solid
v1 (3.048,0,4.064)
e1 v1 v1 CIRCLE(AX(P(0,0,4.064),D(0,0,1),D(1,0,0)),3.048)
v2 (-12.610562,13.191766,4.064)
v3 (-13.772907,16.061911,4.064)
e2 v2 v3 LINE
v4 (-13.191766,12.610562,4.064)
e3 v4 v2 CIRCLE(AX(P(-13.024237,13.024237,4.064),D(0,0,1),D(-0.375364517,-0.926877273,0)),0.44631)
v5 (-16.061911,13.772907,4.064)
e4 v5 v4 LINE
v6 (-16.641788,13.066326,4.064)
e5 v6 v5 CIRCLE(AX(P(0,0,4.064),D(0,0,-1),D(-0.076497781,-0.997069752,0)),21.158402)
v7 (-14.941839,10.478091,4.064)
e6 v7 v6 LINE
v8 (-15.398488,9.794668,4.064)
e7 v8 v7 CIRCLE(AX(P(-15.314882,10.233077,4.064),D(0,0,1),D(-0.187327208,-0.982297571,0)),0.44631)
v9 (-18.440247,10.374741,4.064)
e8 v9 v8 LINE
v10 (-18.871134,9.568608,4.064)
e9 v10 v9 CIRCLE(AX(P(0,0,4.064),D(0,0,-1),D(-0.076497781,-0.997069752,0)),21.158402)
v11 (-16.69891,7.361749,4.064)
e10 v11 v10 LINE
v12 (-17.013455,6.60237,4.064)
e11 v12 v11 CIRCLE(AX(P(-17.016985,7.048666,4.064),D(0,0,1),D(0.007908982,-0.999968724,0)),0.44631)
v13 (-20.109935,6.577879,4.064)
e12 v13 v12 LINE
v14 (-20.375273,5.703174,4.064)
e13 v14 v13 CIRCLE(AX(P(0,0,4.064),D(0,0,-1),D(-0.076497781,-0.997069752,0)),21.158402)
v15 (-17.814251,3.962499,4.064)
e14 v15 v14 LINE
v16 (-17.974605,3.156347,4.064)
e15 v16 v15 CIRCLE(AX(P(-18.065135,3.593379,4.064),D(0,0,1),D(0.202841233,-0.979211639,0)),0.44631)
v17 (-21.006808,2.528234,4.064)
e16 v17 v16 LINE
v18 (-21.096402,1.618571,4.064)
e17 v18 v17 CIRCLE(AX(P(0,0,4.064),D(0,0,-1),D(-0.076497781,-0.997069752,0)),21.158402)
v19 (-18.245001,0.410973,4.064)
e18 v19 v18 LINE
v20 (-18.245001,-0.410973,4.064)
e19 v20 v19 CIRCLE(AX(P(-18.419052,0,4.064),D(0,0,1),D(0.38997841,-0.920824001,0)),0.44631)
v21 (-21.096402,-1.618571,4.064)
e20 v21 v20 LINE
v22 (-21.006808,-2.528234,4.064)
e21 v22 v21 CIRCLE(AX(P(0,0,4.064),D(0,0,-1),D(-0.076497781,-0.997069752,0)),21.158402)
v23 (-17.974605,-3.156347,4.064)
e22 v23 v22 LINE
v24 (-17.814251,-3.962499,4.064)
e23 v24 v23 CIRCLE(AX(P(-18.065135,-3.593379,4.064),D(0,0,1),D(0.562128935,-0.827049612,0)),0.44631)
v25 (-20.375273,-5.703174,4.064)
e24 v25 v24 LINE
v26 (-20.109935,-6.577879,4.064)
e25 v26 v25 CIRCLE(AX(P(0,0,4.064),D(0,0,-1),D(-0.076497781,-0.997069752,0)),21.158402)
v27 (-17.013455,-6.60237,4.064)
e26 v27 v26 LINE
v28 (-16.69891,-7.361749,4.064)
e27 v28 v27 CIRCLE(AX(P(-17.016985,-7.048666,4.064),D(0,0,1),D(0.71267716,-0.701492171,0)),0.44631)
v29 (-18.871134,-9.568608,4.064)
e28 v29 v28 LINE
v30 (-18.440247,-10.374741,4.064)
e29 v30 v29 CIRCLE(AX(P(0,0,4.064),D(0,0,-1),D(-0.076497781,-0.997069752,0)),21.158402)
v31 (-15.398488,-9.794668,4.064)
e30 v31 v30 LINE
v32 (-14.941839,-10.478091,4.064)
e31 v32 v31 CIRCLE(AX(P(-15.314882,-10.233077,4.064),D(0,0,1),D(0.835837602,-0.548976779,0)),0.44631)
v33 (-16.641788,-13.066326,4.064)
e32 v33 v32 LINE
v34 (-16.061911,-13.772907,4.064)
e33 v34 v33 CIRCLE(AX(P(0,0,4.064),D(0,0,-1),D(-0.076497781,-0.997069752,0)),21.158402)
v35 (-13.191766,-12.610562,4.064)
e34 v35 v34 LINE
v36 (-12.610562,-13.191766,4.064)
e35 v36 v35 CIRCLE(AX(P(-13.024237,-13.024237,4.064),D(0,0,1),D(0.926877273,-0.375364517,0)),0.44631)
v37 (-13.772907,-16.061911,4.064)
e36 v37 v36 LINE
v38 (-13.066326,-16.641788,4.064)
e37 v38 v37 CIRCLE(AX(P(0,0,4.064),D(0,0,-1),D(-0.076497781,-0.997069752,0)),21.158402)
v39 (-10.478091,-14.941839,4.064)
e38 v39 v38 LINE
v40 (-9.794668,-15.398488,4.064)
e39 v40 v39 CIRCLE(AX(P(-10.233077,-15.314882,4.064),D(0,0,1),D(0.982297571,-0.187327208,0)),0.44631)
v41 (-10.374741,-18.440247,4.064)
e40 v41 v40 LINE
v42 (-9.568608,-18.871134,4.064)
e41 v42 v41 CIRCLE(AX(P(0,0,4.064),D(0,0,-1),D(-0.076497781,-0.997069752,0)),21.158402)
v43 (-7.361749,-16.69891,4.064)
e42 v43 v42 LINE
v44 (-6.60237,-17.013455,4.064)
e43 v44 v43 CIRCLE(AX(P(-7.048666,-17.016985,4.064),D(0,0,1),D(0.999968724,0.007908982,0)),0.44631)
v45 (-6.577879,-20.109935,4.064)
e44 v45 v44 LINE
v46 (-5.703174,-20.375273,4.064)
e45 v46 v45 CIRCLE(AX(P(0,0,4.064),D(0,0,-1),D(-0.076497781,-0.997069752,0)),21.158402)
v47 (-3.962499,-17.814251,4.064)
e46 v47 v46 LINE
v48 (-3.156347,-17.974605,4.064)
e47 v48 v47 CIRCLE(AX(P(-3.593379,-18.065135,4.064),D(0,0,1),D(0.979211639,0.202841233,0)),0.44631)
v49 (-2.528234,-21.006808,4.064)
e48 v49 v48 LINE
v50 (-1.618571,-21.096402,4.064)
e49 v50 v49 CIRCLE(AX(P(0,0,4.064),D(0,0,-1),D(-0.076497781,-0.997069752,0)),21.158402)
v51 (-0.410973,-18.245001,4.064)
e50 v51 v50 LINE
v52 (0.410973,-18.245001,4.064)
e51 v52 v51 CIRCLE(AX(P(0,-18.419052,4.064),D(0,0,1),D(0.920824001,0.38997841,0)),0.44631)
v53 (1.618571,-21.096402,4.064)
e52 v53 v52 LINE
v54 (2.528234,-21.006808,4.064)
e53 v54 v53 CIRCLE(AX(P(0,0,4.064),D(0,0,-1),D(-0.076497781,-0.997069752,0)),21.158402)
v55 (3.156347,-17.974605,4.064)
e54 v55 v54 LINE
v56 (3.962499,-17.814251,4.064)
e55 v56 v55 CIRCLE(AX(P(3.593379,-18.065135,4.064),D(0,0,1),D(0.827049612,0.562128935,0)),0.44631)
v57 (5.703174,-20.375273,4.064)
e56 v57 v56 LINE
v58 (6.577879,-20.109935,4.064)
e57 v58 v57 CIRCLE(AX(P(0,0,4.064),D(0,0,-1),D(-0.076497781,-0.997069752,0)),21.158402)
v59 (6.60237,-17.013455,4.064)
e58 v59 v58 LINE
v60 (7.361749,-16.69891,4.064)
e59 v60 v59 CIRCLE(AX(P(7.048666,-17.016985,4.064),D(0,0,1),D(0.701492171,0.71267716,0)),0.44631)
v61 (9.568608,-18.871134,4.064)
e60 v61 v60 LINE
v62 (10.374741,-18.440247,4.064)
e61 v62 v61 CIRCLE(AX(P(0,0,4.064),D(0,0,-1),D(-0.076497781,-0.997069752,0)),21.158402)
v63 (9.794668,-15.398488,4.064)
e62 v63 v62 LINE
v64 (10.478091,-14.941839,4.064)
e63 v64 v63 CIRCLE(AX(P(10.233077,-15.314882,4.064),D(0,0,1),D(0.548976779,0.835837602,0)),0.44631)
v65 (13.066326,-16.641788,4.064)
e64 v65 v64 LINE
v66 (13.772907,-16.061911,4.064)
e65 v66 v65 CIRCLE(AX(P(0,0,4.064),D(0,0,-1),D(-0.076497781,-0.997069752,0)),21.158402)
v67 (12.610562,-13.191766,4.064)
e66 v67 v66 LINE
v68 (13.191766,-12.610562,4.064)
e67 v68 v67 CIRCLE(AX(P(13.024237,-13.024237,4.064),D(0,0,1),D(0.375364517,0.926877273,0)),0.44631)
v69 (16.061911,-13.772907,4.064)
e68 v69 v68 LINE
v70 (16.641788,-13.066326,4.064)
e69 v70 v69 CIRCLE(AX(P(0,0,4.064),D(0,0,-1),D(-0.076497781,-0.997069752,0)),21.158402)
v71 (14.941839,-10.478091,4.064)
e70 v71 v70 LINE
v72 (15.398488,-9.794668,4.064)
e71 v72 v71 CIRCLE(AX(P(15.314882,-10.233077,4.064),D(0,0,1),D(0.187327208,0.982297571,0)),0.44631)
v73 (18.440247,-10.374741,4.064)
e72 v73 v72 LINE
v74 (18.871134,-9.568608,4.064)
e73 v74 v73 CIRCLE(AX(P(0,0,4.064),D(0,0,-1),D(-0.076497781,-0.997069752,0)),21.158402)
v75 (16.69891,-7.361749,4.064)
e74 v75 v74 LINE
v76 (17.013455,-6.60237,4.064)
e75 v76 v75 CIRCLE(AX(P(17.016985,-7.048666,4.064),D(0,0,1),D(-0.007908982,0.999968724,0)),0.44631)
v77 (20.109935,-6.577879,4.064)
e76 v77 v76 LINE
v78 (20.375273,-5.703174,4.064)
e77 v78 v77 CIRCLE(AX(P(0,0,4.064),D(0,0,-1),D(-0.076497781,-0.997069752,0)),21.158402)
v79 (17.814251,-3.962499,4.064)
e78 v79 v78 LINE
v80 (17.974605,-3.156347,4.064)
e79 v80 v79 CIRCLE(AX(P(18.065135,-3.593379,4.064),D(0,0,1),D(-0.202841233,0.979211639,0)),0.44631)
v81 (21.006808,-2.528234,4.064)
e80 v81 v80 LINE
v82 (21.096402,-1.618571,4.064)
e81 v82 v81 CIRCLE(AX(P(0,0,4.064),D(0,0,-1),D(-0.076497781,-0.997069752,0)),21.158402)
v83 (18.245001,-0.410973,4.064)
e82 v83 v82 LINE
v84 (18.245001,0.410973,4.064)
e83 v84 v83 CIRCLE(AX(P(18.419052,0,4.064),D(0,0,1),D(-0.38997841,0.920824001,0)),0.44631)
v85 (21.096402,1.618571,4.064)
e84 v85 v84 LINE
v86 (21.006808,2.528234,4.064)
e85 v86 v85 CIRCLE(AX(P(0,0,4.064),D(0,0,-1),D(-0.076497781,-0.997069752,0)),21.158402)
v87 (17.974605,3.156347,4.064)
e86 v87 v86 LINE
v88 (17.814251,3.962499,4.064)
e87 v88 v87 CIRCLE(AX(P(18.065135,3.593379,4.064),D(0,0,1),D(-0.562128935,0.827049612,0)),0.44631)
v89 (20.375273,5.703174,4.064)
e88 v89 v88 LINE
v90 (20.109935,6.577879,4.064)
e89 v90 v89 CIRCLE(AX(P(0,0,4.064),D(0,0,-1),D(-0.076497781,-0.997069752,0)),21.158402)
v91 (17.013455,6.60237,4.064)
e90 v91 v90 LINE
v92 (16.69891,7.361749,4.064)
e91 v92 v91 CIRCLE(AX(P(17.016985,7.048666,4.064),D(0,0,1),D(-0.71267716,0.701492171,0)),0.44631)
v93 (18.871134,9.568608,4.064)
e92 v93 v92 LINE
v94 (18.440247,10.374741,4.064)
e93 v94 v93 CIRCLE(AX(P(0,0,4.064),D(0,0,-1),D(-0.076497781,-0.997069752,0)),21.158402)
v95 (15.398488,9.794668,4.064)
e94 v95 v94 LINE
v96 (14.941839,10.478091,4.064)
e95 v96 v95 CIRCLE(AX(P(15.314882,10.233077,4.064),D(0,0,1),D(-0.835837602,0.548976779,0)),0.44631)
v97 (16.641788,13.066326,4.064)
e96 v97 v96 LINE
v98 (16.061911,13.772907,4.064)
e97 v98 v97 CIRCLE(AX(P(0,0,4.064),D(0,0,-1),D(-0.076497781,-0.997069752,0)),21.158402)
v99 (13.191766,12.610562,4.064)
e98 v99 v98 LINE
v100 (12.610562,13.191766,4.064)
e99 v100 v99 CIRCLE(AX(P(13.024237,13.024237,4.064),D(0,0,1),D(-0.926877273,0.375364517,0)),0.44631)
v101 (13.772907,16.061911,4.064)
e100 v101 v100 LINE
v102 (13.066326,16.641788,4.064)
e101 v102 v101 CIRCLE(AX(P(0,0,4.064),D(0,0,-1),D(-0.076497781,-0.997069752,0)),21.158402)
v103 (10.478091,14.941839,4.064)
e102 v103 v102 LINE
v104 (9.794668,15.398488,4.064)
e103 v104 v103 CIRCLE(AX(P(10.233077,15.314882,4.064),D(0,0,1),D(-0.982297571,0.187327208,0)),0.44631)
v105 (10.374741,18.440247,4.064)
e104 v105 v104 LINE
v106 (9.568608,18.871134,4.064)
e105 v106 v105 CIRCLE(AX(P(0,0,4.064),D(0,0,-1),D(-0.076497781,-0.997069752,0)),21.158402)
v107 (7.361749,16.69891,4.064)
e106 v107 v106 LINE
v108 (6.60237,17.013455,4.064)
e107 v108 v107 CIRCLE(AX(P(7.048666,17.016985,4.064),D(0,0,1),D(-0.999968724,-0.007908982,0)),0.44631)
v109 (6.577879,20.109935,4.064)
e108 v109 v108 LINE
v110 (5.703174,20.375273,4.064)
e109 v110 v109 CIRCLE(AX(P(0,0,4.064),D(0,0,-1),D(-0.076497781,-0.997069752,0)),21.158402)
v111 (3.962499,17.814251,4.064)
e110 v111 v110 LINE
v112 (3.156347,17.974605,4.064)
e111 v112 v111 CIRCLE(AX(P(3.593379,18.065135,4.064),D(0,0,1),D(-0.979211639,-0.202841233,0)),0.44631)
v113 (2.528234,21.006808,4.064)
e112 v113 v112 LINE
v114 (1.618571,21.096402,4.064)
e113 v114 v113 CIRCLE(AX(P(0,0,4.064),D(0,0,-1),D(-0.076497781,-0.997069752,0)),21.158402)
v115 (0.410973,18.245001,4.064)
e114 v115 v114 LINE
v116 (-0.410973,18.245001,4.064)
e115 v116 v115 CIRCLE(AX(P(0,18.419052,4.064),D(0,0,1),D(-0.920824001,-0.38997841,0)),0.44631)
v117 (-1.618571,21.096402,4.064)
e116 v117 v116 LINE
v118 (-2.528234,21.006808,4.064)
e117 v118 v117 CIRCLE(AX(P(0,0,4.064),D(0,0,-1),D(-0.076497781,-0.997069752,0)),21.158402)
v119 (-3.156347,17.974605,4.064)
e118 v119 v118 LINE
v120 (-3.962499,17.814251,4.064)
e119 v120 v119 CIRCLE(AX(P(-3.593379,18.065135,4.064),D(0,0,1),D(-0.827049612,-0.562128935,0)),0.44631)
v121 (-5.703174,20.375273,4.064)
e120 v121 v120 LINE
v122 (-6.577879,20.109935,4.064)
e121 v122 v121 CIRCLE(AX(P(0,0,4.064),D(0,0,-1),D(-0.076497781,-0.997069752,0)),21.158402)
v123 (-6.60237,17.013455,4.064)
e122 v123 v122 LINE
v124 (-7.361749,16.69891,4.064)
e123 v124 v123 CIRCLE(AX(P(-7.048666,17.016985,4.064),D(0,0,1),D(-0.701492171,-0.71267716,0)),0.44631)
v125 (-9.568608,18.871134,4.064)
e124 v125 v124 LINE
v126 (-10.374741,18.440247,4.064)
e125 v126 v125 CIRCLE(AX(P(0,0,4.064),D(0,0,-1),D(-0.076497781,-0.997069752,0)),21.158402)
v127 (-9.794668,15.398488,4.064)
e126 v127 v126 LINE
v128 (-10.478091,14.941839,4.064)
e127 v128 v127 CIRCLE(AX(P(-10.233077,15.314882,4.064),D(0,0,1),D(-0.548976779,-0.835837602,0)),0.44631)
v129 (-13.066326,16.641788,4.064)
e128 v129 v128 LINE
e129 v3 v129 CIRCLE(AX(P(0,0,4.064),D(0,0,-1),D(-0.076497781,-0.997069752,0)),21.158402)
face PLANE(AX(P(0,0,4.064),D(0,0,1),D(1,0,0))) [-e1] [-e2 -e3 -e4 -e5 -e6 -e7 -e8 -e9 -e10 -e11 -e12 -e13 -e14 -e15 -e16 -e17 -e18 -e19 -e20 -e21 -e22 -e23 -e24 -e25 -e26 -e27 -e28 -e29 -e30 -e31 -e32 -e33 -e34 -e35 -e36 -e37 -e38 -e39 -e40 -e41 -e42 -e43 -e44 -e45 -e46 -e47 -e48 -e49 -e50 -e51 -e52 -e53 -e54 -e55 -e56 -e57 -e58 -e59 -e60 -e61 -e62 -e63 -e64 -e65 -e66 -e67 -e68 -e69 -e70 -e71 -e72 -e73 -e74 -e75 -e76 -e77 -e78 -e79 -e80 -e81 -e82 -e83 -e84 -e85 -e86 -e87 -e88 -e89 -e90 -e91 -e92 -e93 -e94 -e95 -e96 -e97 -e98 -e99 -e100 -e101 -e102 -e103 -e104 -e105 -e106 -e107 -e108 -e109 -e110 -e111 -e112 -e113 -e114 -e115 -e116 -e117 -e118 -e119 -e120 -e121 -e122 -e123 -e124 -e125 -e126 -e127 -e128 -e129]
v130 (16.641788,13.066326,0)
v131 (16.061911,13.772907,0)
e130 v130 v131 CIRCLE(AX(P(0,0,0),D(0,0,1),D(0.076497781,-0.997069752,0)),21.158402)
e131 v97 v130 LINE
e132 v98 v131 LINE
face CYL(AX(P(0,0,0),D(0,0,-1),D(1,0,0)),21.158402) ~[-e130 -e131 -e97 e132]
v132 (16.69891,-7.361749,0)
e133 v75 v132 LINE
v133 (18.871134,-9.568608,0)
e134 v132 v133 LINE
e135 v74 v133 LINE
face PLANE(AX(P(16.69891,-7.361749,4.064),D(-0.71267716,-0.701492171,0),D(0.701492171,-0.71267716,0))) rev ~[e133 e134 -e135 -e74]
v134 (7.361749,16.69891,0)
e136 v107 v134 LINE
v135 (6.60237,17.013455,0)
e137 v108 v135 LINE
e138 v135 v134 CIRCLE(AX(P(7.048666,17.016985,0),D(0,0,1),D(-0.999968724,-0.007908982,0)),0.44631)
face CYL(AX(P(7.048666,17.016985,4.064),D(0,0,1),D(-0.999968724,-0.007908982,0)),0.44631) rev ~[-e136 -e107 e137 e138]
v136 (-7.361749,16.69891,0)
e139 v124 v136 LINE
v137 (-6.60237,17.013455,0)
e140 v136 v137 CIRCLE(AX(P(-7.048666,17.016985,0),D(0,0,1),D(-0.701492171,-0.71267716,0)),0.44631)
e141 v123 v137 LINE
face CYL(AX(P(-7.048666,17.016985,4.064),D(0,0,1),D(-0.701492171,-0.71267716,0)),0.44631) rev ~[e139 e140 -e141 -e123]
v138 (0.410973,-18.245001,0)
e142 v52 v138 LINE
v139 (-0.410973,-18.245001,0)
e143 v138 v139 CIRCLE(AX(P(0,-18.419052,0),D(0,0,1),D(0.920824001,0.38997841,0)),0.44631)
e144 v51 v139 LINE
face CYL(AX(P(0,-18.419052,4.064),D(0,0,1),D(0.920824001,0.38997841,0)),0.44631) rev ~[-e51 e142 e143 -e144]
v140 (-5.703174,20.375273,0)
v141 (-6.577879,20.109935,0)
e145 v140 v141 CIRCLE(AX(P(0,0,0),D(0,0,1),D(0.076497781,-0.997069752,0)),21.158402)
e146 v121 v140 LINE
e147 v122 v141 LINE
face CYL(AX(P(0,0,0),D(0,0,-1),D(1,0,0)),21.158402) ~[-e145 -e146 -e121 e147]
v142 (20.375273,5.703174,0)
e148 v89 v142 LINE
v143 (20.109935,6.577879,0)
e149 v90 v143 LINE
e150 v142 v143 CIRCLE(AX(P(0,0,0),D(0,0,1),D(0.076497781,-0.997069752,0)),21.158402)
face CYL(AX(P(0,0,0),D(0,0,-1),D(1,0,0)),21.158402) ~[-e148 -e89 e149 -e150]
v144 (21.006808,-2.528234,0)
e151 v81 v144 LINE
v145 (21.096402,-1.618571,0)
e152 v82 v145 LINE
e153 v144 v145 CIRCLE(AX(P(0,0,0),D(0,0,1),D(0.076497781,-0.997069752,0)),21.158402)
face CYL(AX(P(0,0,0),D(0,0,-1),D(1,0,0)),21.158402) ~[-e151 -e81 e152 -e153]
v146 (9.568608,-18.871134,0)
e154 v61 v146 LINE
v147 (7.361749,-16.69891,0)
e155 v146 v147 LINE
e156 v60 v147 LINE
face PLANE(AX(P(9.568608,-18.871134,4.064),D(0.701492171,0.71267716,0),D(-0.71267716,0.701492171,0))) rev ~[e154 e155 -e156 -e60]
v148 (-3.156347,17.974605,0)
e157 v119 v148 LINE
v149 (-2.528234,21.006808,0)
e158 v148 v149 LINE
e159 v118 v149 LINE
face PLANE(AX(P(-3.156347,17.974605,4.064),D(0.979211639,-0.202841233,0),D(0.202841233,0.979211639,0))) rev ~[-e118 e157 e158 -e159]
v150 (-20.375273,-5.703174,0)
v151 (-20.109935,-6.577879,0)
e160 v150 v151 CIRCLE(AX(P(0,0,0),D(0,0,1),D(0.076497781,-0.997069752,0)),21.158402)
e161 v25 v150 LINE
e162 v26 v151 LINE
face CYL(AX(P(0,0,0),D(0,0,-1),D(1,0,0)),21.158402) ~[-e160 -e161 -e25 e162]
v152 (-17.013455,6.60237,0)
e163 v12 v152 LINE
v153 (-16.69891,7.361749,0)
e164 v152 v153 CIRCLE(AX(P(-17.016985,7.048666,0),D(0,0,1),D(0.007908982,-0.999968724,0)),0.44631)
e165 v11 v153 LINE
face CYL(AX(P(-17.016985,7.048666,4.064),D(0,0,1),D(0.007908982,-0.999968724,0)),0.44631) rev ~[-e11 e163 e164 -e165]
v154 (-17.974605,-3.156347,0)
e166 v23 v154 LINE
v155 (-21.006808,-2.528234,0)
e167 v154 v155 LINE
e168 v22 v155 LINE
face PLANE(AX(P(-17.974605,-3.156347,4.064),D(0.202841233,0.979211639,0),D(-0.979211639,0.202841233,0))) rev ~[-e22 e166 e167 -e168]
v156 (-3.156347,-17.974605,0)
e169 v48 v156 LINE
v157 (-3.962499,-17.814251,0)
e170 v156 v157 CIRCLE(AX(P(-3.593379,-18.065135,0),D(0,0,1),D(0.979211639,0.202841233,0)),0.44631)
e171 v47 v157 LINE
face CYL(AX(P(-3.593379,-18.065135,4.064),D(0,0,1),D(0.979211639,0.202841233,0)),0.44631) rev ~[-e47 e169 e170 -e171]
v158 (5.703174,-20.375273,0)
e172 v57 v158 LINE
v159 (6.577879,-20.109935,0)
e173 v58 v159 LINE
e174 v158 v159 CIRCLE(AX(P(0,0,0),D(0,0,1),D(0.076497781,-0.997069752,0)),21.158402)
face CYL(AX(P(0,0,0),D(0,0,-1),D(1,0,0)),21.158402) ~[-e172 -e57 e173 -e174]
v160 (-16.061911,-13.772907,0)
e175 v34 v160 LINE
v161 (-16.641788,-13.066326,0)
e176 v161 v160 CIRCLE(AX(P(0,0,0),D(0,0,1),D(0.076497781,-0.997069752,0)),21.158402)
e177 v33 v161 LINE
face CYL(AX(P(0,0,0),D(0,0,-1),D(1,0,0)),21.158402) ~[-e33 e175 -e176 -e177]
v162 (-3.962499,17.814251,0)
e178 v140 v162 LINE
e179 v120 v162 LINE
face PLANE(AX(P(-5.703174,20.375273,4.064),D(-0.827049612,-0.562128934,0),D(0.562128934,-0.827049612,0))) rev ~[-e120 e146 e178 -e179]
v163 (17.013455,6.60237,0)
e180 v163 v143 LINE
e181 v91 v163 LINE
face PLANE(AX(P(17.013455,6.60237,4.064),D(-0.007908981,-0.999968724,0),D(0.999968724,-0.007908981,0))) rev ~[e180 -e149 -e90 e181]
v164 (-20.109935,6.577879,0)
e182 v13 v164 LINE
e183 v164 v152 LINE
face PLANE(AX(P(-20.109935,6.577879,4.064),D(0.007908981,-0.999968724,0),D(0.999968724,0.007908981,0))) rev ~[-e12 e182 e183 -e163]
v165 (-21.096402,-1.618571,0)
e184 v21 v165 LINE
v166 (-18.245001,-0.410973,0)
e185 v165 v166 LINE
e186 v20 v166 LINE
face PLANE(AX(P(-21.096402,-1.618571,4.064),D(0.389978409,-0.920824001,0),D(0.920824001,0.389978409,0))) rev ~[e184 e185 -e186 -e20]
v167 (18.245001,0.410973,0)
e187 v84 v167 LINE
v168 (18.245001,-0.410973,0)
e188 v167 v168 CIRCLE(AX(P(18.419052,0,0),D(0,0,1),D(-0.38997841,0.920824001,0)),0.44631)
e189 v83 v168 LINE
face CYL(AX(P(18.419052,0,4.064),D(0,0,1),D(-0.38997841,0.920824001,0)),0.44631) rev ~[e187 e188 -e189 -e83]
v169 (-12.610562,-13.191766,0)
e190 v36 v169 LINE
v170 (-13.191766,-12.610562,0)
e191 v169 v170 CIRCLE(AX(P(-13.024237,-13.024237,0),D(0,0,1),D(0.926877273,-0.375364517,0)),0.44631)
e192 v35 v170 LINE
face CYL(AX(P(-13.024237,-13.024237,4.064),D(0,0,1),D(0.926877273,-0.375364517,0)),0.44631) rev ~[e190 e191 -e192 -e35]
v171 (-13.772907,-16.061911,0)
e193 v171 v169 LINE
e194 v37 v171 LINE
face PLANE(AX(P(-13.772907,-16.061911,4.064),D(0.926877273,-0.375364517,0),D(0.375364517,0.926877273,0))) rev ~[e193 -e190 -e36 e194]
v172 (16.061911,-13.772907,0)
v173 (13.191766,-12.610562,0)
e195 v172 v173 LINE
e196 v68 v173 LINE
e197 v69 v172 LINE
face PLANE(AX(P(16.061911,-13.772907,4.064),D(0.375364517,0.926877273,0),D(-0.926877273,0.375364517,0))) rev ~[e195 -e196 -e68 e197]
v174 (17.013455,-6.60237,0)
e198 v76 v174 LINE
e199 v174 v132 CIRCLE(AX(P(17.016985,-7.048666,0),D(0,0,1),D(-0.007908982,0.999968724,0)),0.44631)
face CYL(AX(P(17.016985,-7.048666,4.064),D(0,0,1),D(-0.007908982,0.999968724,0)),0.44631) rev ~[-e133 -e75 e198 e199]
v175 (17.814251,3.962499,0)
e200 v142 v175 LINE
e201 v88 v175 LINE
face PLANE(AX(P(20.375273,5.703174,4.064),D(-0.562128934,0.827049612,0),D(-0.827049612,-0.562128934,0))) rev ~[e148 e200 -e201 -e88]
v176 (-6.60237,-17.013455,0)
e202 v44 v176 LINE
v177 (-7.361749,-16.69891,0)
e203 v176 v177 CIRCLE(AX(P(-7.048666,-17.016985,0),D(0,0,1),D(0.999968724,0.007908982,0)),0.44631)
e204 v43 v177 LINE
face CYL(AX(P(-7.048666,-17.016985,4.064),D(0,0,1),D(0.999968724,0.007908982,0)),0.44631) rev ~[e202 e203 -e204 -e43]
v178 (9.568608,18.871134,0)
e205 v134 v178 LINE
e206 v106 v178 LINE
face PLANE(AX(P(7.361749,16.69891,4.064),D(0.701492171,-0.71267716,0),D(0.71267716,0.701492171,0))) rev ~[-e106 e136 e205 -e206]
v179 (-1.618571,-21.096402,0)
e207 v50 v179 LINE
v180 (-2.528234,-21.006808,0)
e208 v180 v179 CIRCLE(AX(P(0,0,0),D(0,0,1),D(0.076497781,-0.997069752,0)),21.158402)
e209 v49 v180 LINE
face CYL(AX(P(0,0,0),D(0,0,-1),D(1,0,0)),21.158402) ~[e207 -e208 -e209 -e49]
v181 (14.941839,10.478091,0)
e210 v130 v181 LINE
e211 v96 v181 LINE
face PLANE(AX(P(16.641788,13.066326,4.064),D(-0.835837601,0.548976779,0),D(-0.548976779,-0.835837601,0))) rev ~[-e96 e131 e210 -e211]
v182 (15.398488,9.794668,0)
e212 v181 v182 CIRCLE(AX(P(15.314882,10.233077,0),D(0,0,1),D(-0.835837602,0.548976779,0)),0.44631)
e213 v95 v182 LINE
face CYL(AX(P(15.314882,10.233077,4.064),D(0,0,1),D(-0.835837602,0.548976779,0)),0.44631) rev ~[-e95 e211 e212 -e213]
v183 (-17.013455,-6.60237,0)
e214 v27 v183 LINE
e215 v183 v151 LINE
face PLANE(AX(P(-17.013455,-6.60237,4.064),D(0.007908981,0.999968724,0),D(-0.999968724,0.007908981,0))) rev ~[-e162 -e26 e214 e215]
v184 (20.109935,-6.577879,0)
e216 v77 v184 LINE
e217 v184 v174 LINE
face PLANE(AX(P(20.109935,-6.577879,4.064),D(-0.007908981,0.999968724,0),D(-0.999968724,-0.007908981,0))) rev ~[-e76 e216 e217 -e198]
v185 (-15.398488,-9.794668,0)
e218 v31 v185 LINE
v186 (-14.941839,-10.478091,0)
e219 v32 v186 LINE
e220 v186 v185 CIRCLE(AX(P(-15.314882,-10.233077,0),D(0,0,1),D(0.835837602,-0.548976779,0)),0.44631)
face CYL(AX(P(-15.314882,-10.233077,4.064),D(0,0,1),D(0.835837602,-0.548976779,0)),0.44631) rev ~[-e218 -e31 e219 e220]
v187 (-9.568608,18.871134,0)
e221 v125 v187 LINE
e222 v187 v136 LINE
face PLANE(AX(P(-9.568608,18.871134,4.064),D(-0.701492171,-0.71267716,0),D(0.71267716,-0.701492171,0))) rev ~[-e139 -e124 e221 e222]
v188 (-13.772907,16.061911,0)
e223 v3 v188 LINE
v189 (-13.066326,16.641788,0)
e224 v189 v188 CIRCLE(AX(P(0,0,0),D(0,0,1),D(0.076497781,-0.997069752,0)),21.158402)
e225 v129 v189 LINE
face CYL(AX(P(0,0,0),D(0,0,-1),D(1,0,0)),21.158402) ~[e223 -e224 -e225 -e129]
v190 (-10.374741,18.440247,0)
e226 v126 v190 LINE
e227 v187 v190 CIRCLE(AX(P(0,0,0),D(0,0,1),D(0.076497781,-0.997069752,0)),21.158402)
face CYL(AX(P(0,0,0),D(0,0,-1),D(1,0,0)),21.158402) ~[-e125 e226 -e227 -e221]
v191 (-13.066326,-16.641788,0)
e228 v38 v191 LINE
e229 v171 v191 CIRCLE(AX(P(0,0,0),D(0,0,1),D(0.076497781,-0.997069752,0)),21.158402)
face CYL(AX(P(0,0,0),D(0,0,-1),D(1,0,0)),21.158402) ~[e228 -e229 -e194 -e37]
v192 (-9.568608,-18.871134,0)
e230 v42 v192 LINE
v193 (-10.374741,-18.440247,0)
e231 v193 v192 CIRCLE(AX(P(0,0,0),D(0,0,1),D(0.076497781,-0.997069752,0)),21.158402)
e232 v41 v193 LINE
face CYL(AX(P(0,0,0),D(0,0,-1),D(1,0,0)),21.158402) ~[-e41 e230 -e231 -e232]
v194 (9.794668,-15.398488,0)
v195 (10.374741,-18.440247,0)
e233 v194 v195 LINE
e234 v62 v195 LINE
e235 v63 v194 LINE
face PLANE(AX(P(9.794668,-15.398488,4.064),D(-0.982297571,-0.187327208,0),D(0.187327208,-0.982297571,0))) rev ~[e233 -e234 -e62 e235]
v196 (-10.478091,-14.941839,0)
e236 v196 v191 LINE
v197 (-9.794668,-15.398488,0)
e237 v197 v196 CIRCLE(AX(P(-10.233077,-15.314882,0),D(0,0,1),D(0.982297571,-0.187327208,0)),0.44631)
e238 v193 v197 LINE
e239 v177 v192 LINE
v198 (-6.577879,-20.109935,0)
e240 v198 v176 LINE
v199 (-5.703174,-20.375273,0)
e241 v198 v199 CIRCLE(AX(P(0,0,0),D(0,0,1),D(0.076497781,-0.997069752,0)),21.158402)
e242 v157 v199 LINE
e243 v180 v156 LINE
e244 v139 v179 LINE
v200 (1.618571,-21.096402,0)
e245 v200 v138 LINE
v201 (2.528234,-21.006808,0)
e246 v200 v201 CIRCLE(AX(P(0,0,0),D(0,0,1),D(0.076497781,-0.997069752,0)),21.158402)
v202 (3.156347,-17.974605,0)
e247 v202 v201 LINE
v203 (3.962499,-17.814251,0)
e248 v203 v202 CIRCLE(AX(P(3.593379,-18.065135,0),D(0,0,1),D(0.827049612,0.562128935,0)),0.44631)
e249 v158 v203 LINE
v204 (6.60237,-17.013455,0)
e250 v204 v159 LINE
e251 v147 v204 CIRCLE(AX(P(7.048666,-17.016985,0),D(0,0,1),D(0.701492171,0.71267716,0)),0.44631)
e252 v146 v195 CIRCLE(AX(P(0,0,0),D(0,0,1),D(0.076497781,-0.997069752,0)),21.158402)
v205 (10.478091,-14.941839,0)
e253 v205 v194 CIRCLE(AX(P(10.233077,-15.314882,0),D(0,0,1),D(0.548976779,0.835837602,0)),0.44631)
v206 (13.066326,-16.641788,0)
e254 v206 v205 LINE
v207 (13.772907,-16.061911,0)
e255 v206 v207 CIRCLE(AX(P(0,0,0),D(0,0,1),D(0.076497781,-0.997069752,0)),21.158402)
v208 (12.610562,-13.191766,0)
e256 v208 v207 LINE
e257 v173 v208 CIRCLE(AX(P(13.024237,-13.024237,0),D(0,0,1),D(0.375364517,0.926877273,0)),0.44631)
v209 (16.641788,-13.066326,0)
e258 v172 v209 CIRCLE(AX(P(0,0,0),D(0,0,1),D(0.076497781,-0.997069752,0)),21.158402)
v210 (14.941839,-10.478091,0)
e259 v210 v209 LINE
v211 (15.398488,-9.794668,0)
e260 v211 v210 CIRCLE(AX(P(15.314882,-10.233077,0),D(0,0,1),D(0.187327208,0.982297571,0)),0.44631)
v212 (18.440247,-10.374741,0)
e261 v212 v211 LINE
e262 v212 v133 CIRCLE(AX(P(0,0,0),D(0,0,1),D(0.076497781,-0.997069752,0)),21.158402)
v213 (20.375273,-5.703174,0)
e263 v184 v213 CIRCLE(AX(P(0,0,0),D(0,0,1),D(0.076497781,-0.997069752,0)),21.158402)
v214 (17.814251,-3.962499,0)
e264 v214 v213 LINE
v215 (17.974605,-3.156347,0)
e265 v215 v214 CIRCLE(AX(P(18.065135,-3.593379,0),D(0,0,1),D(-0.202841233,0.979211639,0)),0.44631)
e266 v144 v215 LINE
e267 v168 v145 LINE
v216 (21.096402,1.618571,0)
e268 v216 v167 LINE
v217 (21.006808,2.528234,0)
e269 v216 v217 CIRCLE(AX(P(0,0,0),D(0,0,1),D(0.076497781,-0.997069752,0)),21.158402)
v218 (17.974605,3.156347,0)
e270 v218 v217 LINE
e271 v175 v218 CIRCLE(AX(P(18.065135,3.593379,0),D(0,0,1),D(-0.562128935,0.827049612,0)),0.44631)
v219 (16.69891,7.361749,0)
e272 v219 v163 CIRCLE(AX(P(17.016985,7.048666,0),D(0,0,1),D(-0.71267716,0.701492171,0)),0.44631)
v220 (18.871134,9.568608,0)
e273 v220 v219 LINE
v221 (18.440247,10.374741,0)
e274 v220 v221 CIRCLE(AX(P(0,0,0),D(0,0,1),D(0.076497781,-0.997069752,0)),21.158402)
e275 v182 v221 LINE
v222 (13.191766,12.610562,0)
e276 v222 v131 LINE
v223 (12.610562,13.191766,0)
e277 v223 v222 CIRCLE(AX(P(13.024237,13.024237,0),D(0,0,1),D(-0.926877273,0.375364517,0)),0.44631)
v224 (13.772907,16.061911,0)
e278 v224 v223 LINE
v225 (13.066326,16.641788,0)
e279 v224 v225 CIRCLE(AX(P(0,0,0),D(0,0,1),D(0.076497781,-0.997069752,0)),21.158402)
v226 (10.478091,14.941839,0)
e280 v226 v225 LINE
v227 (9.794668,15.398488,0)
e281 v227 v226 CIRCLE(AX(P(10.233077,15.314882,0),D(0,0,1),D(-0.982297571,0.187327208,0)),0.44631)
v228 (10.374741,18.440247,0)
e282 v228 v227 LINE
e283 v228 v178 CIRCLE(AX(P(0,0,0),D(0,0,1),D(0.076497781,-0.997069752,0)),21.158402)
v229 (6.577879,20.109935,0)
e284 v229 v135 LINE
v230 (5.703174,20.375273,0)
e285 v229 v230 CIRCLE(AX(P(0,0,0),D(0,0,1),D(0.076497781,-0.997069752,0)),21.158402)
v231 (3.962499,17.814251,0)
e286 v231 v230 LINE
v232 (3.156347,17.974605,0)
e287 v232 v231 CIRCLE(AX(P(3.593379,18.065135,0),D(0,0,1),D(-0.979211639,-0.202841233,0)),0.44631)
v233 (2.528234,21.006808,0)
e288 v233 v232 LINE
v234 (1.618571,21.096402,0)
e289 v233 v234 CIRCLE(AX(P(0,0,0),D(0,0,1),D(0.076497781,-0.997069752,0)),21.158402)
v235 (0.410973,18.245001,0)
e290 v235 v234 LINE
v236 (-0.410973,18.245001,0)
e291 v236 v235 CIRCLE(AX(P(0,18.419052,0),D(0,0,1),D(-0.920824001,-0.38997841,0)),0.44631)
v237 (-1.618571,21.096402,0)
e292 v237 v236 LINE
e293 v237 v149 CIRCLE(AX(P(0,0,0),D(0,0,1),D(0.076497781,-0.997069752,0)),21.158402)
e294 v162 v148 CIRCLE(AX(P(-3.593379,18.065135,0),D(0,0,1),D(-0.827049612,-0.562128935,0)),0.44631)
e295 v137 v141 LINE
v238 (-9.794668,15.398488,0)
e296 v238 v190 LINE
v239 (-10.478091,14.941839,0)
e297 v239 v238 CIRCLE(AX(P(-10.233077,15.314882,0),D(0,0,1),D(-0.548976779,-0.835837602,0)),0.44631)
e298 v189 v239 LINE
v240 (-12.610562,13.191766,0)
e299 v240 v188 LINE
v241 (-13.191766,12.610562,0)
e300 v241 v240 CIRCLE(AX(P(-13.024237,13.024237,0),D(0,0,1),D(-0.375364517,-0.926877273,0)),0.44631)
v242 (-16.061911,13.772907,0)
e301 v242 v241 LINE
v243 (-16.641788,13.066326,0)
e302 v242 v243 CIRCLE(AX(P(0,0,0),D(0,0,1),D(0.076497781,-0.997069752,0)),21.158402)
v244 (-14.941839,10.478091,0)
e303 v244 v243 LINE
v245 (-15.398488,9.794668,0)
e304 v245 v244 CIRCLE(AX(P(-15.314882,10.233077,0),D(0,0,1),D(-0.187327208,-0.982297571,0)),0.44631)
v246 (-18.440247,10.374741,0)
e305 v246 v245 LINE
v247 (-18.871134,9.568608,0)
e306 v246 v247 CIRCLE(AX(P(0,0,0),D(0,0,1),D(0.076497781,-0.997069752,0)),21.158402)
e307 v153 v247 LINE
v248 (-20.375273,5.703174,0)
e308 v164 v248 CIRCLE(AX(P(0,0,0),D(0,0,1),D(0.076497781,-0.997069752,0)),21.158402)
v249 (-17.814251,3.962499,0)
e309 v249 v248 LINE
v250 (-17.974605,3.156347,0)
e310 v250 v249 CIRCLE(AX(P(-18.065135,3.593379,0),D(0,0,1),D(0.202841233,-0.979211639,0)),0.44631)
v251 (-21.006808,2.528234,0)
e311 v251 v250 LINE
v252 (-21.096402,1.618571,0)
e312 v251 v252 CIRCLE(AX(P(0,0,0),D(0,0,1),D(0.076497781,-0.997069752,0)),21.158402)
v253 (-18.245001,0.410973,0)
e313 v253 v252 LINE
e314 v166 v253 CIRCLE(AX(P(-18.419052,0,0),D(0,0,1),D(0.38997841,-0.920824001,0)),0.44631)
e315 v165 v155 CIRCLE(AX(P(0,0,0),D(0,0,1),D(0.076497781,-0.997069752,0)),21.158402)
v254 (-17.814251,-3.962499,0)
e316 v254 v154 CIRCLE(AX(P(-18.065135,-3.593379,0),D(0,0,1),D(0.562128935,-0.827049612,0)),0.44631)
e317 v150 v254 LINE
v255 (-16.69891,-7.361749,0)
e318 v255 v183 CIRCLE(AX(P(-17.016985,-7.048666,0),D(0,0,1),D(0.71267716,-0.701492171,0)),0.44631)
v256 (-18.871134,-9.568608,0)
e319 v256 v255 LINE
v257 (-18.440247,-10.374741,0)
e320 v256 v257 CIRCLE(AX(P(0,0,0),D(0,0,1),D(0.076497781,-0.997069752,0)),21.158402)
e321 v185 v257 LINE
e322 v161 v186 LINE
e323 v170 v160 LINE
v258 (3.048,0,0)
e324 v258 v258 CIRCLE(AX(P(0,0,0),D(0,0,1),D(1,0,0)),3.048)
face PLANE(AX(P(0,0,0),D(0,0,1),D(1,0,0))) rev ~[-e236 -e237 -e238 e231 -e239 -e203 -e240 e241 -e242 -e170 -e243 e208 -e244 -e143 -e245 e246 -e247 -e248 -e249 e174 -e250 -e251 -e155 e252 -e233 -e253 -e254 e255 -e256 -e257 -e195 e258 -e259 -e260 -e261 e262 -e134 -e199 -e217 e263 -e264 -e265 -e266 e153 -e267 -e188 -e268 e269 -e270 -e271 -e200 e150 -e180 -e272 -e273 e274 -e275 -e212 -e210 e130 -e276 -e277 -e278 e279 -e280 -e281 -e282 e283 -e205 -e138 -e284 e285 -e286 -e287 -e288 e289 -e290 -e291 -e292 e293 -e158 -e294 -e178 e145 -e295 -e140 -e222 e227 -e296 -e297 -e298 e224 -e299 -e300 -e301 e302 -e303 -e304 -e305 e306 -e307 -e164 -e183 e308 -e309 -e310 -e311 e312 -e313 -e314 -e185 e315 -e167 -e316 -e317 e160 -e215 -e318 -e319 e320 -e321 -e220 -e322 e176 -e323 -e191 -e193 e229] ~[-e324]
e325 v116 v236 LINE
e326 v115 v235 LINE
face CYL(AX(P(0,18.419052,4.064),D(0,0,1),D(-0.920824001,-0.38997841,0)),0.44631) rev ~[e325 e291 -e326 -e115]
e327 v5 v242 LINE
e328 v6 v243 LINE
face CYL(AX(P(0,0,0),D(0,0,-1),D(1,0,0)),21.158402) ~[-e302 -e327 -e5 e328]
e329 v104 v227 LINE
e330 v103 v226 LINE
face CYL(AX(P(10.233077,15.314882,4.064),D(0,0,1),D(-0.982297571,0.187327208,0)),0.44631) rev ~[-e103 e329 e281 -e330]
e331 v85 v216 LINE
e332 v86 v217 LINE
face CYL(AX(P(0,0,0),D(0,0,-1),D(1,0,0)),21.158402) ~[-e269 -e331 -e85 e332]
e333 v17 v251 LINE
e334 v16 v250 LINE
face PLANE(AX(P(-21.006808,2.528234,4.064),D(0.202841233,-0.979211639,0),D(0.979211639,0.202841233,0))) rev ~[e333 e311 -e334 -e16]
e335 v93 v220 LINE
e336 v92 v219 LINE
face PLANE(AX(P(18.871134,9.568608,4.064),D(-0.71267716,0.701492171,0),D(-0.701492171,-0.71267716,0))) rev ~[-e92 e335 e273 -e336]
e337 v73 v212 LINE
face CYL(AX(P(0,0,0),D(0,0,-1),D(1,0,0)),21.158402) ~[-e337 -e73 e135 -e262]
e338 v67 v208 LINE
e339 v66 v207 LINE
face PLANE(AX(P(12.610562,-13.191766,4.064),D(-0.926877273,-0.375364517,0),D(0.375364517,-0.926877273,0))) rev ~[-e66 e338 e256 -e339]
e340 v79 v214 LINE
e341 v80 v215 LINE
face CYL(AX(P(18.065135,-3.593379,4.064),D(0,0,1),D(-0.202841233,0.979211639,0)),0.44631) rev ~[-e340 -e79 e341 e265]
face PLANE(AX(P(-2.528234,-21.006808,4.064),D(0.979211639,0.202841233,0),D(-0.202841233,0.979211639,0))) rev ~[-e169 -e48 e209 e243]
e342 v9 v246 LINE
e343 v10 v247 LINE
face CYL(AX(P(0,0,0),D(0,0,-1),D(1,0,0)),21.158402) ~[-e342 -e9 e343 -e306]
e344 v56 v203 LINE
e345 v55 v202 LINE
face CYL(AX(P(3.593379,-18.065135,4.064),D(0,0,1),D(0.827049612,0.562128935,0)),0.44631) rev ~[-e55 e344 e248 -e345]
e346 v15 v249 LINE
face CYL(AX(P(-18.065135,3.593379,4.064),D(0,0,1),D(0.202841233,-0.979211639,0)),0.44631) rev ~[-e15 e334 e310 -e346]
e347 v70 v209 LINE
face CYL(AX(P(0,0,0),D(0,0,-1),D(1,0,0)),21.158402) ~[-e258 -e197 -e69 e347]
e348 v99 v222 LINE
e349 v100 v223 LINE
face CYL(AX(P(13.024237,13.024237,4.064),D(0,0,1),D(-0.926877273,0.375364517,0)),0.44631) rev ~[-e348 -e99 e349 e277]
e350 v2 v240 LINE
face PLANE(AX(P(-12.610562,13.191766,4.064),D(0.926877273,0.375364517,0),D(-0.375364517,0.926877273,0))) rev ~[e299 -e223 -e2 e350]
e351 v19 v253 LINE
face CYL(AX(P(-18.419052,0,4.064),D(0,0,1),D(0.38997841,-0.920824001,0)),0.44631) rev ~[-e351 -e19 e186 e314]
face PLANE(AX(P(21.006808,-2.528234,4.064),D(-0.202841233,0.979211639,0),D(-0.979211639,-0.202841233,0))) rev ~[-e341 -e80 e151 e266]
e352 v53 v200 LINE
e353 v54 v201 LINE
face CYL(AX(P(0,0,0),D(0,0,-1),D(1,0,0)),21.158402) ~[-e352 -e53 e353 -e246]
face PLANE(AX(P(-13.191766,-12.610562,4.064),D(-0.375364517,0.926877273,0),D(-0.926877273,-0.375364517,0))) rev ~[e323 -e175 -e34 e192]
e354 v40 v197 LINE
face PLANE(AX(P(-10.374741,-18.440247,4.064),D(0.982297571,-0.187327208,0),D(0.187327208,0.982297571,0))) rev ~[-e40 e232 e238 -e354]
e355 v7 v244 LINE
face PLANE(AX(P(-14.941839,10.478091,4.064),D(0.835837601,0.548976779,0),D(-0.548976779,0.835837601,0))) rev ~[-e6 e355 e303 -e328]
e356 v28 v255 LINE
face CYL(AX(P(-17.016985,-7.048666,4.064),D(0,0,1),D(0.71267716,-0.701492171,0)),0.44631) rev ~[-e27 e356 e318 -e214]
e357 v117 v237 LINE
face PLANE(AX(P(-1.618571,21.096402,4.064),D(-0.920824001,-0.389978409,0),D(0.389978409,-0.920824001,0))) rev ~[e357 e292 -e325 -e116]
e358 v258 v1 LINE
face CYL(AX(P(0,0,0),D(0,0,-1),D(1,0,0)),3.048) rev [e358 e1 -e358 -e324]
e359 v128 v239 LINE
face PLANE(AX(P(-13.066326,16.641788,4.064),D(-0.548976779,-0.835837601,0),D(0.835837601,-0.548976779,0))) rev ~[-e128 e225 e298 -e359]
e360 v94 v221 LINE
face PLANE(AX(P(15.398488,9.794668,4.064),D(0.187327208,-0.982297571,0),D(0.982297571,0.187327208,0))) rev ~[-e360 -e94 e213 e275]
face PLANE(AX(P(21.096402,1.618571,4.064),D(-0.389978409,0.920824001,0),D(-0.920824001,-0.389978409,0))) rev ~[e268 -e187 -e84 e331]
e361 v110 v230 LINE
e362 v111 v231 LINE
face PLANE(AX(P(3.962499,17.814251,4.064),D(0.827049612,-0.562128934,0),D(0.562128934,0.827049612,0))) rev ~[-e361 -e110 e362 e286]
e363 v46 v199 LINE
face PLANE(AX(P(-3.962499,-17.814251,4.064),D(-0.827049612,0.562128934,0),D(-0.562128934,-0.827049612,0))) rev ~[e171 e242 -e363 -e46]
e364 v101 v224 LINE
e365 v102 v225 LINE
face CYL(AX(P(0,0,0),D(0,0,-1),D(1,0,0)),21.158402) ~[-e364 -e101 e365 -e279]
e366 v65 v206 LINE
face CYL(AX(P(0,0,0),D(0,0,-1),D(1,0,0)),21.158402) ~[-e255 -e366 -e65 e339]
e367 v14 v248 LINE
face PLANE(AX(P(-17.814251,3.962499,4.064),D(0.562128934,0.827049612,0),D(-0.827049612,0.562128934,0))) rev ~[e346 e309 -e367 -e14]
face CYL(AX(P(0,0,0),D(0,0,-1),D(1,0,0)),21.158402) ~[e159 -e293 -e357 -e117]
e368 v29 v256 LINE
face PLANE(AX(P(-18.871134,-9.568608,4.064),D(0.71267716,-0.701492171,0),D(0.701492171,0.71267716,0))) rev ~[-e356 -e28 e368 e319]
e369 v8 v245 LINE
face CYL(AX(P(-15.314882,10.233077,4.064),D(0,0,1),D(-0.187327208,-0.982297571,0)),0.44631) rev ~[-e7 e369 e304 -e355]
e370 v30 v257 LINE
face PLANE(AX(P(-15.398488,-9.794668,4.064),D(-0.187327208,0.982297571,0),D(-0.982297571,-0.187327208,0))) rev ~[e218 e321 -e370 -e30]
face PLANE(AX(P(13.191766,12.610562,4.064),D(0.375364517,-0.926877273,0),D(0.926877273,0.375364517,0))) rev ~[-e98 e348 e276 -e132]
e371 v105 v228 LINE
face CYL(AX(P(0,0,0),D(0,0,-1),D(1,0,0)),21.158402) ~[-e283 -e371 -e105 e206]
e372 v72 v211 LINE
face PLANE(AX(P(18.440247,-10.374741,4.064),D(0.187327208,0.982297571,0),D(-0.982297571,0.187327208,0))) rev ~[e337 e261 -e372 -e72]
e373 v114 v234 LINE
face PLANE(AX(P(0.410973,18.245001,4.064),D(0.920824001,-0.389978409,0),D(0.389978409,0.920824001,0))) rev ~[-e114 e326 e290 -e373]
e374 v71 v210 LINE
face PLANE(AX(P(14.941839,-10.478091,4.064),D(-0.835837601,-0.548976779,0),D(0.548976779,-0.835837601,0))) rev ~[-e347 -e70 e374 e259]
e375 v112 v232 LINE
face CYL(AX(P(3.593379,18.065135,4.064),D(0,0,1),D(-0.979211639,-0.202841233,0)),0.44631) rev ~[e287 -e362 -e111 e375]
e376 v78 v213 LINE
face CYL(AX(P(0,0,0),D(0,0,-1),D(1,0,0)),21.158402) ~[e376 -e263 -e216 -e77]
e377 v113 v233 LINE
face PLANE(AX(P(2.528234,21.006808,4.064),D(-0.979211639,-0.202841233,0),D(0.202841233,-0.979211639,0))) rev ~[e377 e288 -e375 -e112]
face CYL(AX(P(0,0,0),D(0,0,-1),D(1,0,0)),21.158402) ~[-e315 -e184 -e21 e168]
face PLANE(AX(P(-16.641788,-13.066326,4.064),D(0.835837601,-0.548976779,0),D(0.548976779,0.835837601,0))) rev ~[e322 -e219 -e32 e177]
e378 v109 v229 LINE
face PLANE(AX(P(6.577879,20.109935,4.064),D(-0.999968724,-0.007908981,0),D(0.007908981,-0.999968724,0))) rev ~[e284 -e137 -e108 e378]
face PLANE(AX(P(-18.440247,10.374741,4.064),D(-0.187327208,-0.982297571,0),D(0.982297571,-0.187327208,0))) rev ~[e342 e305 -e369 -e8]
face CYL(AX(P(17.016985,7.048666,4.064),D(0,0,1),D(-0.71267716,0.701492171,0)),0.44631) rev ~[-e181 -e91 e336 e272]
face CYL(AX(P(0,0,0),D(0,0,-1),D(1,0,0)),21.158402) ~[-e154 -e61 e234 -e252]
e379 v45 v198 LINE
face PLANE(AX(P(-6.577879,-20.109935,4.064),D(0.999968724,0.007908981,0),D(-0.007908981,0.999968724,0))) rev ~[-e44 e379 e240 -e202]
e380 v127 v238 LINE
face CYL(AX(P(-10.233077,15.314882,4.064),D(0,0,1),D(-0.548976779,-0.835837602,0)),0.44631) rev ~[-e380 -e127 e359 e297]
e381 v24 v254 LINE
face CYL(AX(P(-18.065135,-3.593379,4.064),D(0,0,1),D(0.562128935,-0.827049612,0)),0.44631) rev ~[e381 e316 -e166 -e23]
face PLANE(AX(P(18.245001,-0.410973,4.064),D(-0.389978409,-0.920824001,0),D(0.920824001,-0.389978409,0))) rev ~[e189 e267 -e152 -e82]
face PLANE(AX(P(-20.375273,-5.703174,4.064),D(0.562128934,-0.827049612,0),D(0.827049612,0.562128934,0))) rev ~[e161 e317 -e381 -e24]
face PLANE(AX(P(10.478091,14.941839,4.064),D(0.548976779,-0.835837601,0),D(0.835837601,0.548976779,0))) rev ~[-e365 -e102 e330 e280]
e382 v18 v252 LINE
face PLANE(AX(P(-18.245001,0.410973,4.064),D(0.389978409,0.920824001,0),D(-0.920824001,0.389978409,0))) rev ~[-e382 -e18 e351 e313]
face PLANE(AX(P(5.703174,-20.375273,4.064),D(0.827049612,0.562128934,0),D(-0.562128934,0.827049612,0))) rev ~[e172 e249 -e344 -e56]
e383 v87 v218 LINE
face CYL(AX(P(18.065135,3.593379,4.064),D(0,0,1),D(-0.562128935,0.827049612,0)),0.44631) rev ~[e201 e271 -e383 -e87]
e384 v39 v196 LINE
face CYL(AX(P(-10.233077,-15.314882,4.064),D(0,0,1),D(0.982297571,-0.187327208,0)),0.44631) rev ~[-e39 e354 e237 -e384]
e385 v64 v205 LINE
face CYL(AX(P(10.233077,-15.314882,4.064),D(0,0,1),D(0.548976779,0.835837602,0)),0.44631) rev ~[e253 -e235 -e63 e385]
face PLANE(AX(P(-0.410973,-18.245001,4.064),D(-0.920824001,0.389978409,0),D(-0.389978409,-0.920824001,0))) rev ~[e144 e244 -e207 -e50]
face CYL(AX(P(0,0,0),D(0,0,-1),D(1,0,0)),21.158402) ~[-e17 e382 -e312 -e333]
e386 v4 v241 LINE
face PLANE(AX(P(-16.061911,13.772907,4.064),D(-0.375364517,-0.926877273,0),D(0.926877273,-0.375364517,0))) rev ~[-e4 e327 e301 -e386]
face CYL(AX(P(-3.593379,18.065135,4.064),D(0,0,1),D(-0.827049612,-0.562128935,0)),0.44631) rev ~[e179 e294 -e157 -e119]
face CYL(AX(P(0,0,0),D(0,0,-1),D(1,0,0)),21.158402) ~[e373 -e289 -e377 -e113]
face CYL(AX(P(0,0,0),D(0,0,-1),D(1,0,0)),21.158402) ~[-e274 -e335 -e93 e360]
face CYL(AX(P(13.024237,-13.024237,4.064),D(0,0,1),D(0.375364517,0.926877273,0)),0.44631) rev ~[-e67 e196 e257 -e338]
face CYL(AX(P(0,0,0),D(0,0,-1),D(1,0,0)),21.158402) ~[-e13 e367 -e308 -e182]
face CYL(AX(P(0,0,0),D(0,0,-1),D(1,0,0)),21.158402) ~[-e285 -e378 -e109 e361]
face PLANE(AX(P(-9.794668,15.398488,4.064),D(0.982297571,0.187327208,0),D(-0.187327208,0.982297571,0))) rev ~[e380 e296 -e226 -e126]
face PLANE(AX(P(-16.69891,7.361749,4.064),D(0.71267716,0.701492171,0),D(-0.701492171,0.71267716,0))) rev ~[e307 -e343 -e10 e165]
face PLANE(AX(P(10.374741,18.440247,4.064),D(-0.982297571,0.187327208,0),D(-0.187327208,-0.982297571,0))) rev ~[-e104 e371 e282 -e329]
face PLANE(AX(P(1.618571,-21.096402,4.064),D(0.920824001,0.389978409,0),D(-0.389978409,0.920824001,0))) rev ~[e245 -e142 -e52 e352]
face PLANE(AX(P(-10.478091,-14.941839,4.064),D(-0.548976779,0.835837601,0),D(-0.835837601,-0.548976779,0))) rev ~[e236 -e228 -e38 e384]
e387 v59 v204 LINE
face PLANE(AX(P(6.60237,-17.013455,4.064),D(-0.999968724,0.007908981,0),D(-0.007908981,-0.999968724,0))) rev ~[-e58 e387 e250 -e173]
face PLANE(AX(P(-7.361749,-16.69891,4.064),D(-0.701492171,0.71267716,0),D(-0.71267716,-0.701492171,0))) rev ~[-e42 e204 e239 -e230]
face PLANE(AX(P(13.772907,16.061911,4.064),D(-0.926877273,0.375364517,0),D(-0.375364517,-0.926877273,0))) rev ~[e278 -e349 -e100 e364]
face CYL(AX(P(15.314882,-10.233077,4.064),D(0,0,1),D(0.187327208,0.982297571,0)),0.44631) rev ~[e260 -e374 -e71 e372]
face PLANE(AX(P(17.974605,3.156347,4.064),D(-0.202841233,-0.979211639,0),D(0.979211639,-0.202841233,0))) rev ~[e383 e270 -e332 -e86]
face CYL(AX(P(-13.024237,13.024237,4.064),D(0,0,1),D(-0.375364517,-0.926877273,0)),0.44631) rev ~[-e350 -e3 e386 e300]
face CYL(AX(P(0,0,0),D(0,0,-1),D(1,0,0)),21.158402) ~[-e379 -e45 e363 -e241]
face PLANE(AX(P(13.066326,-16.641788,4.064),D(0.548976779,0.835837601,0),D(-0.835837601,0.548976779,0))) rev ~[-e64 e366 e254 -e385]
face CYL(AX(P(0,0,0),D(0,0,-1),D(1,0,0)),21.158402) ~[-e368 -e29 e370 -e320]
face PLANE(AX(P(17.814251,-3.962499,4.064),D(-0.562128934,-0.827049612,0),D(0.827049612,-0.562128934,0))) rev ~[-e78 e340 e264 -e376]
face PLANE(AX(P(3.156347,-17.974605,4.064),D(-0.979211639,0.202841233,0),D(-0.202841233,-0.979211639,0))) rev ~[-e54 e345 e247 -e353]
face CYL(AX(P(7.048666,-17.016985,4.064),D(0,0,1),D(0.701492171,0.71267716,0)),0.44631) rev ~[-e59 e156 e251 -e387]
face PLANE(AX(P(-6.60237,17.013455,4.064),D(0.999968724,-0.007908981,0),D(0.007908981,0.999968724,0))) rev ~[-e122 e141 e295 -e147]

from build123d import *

# Parameters (mm, degrees)
F0_R            = 21.158401666
F0_R_2          = 3.048
F1_DEPTH        = 4.064
F3_DEPTH        = 4.064
F3_COPIES_COUNT = 32


# Not quite as in the source:
# - a pattern or mirror of a feature is missing from the dataset's text; its kind, count and spacing are read off the source's solid


with BuildPart() as f1:
    # F0 (on Top) → F1 (new body)
    with BuildSketch(Plane.XY):
        Circle(F0_R)
        Circle(F0_R_2, mode=Mode.SUBTRACT)
    extrude(amount=F1_DEPTH)

    # F2 (on face) → F3 (cut, through all)
    with BuildSketch(Plane.XY.offset(4.064)):
        with BuildLine():
            Line((-0.4109729921, -18.2450008044), (-1.6185707702, -21.0964022933))
            ThreePointArc((-1.6185707702, -21.0964022933), (0, -21.158401666), (1.6185707702, -21.0964022933))
            Line((1.6185707702, -21.0964022933), (0.4109729921, -18.2450008044))
            ThreePointArc((0.4109729921, -18.2450008044), (0, -17.9727420469), (-0.4109729921, -18.2450008044))
        make_face()
    f3 = extrude(amount=-F3_DEPTH, mode=Mode.SUBTRACT)

    # F3_copies: F3 ×32 about axis
    f3_copies_axis = Axis((0, 0, 0), (0, 0, 1))
    for i in range(1, F3_COPIES_COUNT):
        add(f3.rotate(f3_copies_axis, i * 360 / F3_COPIES_COUNT), mode=Mode.SUBTRACT)


solid = f1.part
